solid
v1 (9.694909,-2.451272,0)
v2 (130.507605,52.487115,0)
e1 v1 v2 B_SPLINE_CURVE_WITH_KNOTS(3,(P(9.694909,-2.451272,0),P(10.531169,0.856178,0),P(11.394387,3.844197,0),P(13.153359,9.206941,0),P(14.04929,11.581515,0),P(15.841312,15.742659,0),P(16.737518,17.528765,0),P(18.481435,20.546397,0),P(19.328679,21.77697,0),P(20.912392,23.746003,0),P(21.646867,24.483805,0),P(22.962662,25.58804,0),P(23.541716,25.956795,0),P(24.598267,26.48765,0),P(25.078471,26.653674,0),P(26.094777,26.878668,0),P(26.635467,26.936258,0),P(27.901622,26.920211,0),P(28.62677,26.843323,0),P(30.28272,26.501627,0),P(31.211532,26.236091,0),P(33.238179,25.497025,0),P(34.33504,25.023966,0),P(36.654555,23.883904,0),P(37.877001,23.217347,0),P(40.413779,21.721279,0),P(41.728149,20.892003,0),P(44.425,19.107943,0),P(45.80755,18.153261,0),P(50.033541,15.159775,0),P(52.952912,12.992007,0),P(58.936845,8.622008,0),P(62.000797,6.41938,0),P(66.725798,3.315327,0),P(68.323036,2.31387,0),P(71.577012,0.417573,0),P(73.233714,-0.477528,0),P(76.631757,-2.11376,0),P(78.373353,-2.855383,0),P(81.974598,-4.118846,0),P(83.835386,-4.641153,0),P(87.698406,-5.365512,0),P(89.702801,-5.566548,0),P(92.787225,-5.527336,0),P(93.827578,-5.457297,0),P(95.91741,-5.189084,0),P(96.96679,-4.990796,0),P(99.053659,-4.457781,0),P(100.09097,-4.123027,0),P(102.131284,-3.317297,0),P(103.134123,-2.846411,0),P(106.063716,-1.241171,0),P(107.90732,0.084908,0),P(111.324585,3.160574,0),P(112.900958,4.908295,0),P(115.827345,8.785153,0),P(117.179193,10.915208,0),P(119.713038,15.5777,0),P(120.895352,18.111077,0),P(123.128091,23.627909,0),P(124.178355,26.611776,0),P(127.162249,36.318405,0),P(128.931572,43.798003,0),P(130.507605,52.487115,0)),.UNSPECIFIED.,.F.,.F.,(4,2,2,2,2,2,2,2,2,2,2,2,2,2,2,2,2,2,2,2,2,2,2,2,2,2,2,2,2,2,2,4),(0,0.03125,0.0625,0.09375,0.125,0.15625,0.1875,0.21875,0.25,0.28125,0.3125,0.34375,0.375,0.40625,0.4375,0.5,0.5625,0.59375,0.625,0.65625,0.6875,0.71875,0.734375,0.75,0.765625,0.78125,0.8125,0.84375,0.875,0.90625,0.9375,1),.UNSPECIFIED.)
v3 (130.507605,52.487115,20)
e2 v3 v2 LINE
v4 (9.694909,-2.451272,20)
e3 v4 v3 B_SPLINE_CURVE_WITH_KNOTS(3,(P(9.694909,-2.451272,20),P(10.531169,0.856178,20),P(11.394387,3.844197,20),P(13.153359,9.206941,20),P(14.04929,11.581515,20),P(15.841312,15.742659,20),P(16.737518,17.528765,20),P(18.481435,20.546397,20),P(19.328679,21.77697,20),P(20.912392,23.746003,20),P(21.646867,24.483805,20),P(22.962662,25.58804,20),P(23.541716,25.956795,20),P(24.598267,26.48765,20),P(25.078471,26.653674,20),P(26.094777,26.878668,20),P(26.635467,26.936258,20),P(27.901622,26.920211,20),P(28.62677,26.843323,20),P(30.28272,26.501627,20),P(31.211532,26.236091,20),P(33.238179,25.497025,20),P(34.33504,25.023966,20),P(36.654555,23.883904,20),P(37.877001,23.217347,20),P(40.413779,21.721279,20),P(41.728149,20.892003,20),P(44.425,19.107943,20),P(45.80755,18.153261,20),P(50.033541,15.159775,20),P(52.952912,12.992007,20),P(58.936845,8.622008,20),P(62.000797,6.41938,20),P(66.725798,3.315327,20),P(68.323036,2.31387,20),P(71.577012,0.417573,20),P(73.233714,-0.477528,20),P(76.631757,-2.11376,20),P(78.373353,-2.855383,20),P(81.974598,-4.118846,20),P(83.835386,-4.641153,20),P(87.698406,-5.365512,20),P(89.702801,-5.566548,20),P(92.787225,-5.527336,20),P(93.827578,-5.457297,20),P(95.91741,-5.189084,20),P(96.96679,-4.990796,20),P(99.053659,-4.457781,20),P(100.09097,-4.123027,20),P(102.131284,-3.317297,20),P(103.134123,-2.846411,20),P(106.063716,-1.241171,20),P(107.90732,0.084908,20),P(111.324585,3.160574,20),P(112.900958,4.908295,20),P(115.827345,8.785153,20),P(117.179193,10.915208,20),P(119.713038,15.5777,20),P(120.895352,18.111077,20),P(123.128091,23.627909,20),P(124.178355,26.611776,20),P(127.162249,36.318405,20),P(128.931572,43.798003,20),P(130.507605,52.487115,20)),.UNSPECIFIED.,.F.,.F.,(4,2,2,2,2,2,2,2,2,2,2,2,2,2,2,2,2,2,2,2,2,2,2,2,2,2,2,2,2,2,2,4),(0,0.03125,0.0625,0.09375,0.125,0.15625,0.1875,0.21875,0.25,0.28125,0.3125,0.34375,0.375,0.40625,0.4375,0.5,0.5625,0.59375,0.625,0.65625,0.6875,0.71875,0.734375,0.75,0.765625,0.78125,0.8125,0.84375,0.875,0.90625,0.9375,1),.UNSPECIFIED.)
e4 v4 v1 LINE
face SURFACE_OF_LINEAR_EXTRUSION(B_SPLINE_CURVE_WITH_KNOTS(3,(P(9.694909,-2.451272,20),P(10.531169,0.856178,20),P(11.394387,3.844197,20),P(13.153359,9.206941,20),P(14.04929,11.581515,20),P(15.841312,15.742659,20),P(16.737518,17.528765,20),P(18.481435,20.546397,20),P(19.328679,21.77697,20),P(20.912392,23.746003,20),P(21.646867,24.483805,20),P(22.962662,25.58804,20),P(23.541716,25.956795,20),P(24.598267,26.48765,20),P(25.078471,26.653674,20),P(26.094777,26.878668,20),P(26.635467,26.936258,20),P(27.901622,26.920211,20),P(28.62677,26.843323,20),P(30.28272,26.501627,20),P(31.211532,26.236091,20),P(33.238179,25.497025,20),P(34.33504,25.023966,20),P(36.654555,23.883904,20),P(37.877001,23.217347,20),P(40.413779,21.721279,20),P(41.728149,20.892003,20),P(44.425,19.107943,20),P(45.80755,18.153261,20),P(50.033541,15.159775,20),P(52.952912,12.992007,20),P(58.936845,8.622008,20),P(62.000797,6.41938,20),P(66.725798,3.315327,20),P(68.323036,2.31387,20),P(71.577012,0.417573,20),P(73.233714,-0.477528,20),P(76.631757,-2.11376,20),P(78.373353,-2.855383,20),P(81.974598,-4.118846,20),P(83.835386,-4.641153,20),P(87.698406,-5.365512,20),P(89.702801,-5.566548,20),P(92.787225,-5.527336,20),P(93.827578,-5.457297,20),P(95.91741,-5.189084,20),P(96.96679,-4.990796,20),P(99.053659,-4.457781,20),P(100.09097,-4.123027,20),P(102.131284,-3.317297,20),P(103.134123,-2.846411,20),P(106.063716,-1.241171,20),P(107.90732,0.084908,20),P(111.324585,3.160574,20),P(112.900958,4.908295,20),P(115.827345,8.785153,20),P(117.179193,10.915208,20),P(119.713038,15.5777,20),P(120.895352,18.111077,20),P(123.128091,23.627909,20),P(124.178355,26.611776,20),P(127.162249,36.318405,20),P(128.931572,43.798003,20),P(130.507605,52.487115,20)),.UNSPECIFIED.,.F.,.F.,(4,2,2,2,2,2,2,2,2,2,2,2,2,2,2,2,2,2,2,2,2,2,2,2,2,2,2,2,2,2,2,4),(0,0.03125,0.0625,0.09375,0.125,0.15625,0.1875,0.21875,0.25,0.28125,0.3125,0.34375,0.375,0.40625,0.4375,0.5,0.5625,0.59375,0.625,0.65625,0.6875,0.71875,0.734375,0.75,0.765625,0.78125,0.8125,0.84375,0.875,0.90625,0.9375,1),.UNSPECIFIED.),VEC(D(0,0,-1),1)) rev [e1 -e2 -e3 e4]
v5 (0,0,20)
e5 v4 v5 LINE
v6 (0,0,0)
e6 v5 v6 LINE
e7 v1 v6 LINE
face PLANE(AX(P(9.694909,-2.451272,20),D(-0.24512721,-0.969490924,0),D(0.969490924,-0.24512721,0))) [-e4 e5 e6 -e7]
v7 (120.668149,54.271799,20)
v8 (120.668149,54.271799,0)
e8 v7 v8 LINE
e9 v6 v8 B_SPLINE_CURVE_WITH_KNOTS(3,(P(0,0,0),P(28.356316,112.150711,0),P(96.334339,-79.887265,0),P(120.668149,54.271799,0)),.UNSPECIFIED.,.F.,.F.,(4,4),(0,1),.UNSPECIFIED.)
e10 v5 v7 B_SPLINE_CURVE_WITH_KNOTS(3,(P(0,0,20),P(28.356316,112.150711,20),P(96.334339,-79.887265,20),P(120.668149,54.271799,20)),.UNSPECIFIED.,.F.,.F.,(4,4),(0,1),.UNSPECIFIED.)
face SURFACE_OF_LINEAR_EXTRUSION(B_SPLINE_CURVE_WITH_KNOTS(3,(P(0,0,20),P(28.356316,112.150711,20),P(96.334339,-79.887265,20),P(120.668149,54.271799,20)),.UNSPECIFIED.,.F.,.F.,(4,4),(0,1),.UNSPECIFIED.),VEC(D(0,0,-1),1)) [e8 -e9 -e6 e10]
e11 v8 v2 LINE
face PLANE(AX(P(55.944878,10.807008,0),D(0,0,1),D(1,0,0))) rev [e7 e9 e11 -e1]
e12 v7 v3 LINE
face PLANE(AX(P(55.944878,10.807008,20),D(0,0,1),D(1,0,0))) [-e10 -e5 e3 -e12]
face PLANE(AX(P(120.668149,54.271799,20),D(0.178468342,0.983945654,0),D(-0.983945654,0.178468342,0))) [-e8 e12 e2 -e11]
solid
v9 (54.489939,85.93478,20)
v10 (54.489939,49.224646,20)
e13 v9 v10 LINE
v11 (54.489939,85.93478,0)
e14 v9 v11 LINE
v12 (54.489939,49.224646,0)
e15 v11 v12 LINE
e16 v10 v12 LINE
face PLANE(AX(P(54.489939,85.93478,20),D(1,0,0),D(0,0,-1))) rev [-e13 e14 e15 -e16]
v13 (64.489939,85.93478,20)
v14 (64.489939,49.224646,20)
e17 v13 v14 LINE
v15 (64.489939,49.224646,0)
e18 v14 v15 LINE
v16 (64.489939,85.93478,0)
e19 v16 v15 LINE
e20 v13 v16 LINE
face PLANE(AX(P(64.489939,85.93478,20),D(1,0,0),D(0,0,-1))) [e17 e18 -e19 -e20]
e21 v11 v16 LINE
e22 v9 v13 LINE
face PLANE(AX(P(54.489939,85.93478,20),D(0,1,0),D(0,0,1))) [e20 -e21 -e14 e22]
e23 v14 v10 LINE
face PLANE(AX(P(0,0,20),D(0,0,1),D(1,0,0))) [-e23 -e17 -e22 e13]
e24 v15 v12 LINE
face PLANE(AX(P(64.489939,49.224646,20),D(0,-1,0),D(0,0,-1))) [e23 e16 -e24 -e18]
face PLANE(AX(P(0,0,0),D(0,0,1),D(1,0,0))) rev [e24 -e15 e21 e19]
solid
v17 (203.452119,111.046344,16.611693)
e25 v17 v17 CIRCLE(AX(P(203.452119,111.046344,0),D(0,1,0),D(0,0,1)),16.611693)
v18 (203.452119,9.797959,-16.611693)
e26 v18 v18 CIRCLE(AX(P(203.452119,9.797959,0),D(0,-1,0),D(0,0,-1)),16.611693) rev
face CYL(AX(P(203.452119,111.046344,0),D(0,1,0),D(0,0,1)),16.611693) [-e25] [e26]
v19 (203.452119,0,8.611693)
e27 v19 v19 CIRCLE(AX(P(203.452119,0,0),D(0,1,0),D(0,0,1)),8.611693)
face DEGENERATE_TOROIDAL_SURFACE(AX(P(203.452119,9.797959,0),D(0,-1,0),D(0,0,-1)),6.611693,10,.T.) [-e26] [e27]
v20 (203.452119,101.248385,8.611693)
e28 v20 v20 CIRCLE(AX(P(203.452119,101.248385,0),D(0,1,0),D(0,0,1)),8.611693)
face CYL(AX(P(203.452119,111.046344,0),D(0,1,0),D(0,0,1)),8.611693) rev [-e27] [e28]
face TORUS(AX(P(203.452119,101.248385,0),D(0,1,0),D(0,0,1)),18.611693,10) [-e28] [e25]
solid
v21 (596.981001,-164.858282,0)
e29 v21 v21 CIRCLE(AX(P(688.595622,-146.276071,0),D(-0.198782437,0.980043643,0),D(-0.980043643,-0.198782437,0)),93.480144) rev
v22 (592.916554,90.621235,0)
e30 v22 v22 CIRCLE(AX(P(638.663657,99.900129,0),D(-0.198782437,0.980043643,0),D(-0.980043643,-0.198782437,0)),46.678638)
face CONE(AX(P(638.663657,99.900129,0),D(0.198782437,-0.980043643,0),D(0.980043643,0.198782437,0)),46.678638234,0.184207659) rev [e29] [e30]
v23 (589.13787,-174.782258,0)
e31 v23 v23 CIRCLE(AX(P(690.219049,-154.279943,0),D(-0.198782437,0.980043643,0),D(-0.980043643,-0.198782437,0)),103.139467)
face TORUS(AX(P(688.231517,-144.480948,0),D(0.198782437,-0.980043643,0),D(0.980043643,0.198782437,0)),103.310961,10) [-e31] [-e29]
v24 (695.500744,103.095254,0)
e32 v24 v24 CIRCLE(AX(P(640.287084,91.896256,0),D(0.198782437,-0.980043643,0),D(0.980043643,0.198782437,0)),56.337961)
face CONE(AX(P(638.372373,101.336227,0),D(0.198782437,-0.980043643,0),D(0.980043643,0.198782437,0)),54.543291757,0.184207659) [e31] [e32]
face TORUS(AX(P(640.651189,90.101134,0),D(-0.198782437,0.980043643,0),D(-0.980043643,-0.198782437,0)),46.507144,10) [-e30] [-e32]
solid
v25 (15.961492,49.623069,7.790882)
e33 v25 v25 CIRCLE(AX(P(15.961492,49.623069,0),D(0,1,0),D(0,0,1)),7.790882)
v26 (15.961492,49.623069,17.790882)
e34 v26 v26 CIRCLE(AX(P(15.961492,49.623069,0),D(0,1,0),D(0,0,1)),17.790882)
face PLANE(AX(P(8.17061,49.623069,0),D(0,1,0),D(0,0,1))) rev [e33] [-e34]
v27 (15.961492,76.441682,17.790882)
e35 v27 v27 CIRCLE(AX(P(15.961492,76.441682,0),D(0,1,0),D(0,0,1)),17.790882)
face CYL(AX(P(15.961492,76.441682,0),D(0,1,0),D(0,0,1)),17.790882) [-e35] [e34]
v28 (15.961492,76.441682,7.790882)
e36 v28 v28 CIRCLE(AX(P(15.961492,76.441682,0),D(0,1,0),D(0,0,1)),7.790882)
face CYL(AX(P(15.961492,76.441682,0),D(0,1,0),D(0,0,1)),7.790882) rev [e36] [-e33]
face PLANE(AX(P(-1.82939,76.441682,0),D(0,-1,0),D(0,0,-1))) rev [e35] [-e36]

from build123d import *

# Parameters (mm, degrees)
EXTRUDE_THIN1_OUTLINE_W = 9.999999999999993
EXTRUDE_THIN1_OUTLINE_H = 36.710134862
EXTRUDE_THIN1_DEPTH     = 20
SKETCH3_W               = 10
SKETCH3_H               = 26.81861266200005
SKETCH4_W               = 8
SKETCH4_H               = 111.0463440008494
FILLET1_R               = 10
FILLET2_R               = 10
FILLET6_R               = 10
FILLET7_R               = 10


# Read off the part's stored shape, not the designer's step: Extrude-Thin1
with BuildPart() as part:
    # Extrude-Thin1 outline → Extrude-Thin1 (new body)
    with BuildSketch(Plane.XY):
        with Locations((59.489938632999994, 67.579713016)):
            Rectangle(EXTRUDE_THIN1_OUTLINE_W, EXTRUDE_THIN1_OUTLINE_H)
        with BuildLine():
            Line((0, 0), (9.694909236, -2.4512721))
            add(Edge.make_bspline(
                [(9.694909236, -2.4512721), (10.5311688474778, 0.856178359172851), (11.394386774256, 3.84419741254524), (13.1533592305206, 9.20694051284605), (14.0492896362296, 11.5815145840632), (15.8413121087331, 15.742658734528), (16.737517517862, 17.5287647227855), (18.4814345025707, 20.5463967391919), (19.3286793802721, 21.7769702062188), (20.9123918030556, 23.7460025130972), (21.6468668792936, 24.4838050755776), (22.9626621572418, 25.5880403665081), (23.5417164826069, 25.9567946857274), (24.5982667995349, 26.4876499635343), (25.0784708138462, 26.6536744426382), (26.0947773614352, 26.8786677388824), (26.6354672734258, 26.9362581428574), (27.9016220528546, 26.9202105728274), (28.6267698076733, 26.8433228296364), (30.2827198681421, 26.501626749094), (31.2115323200941, 26.2360905599305), (33.2381790124912, 25.4970253861064), (34.3350401710325, 25.0239655597566), (36.6545545212303, 23.8839035231942), (37.8770010886368, 23.2173466425486), (40.413779447504, 21.7212794308362), (41.7281493534382, 20.8920027901708), (44.4249998964398, 19.1079431631433), (45.8075500630837, 18.1532614063299), (50.0335414120897, 15.1597754687626), (52.9529117796699, 12.9920070265115), (58.9368445543254, 8.62200824840444), (62.0007966750851, 6.41938014676282), (66.7257978693274, 3.31532694879324), (68.3230359680193, 2.313869999449), (71.5770117142215, 0.417572758509964), (73.2337136485033, -0.477527792876216), (76.6317569670157, -2.11375987107278), (78.3733528188264, -2.85538269335876), (81.9745983323873, -4.11884560626711), (83.8353857946341, -4.64115314789327), (87.6984061214208, -5.36551199552065), (89.7028005800273, -5.56654784071354), (92.7872249227571, -5.52733551388739), (93.8275778829024, -5.45729724278707), (95.9174101948477, -5.18908376162479), (96.9667901072056, -4.99079603224231), (99.0536589714669, -4.45778102161726), (100.0909704087, -4.12302677221439), (102.131284140322, -3.3172969507252), (103.13412254263, -2.84641134529941), (106.063715631323, -1.24117058796995), (107.907320493612, 0.0849084234402593), (111.324584701444, 3.16057354469398), (112.900958390548, 4.90829500464283), (115.827345406093, 8.7851531963294), (117.179193265889, 10.9152075498616), (119.713037579898, 15.5776997205682), (120.895351993834, 18.1110774147558), (123.128090663281, 23.6279089006282), (124.178355260339, 26.6117757902841), (127.162248988825, 36.3184054964138), (128.931571554216, 43.7980034470408), (130.507605163, 52.487115477)],
                knots=[0, 0, 0, 0, 0.03125, 0.03125, 0.0624999999999999, 0.0624999999999999, 0.0937499999999999, 0.0937499999999999, 0.125, 0.125, 0.15625, 0.15625, 0.1875, 0.1875, 0.21875, 0.21875, 0.25, 0.25, 0.28125, 0.28125, 0.3125, 0.3125, 0.34375, 0.34375, 0.375, 0.375, 0.40625, 0.40625, 0.4375, 0.4375, 0.5, 0.5, 0.5625, 0.5625, 0.59375, 0.59375, 0.625, 0.625, 0.65625, 0.65625, 0.6875, 0.6875, 0.71875, 0.71875, 0.734375, 0.734375, 0.75, 0.75, 0.765625, 0.765625, 0.78125, 0.78125, 0.8125, 0.8125, 0.84375, 0.84375, 0.875, 0.875, 0.90625, 0.90625, 0.9375, 0.9375, 1, 1, 1, 1], degree=3))
            Line((130.507605163, 52.487115477), (120.668148619, 54.2717989))
            add(Edge.make_bspline(
                [(0, 0), (28.3563158244911, 112.15071072711), (96.3343394540236, -79.8872652449302), (120.668148619, 54.2717989)],
                knots=[0, 0, 0, 0, 1, 1, 1, 1], degree=3))
        make_face()
    extrude(amount=EXTRUDE_THIN1_DEPTH)


with BuildPart() as body_2:
    # Sketch3 → Revolve-Thin1 (revolve)
    with BuildSketch(Plane.XY, mode=Mode.PRIVATE) as revolve_thin1_sk:
        with Locations((3.1706102671758742, 63.03237569384922)):
            Rectangle(SKETCH3_W, SKETCH3_H)
    revolve(revolve_thin1_sk.sketch.rotate(Axis((15.961492157812756, 76.44168202484924, 0), (0, -1, 0)), 270), axis=Axis((15.961492157812756, 76.44168202484924, 0), (0, -1, 0)))


with BuildPart() as body_3:
    # Sketch4 → Revolve-Thin2 (revolve)
    with BuildSketch(Plane.XY, mode=Mode.PRIVATE) as revolve_thin2_sk:
        with Locations((190.84042517006557, 55.5231720004247)):
            Rectangle(SKETCH4_W, SKETCH4_H)
    revolve(revolve_thin2_sk.sketch.rotate(Axis((203.4521186248573, 111.04634400084939, 0), (0, -1, 0)), 270), axis=Axis((203.4521186248573, 111.04634400084939, 0), (0, -1, 0)))

    # Fillet1
    # the kernel refuses this fillet: 10 mm, written as the material it takes off along each edge
    with BuildSketch(Plane(origin=(203.4521186248573, 111.04634400084939, 0), x_dir=(0, 0, 1), z_dir=(1, 0, 0))) as fillet1_piece_1:
        with BuildLine():
            CenterArc((18.61169345479169, 9.797958971132715), FILLET1_R, 180, 78.4630409671845)
            Line((16.61169345479169, 0), (16.571693454791692, -0.19595917942265828))
            ThreePointArc((16.571693454791692, -0.19595917942265828), (12.611693454791691, -0.20000000000000284), (8.611693454791691, -0.20000000000000284))
            Line((8.611693454791691, -0.20000000000000284), (8.411693454791692, 0))
            Line((8.411693454791692, 0), (8.411693454791692, 9.797958971132715))
            Line((8.411693454791692, 9.797958971132715), (8.611693454791691, 9.797958971132715))
        make_face()
    revolve(axis=Axis((203.4521186248573, 111.04634400084939, 0), (0, -1, 0)), mode=Mode.SUBTRACT)

    # Fillet2
    # the kernel refuses this fillet: 10 mm, written as the material it takes off along each edge
    with BuildSketch(Plane(origin=(203.4521186248573, 0, 0), x_dir=(1.71e-15, 0, 1), z_dir=(1, 0, -1.71e-15))) as fillet2_piece_1:
        with BuildLine():
            CenterArc((6.611693454791691, -9.797958971132712), FILLET2_R, 0, 78.4630409671845)
            Line((16.61169345479169, -9.797958971132712), (16.81169345479169, -9.797958971132712))
            Line((16.81169345479169, -9.797958971132712), (16.81169345479169, 0))
            Line((16.81169345479169, 0), (16.61169345479169, 0.2))
            ThreePointArc((16.61169345479169, 0.2), (12.611693454791691, 0.2), (8.65169345479169, 0.19595917942265426))
            Line((8.65169345479169, 0.19595917942265426), (8.611693454791691, 0))
        make_face()
    revolve(axis=Axis((203.4521186248573, 0, 0), (0, -1, 0)), mode=Mode.SUBTRACT)


with BuildPart() as body_4:
    # Sketch8 → Revolve-Thin3 (revolve)
    with BuildSketch(Plane.XY):
        Polygon((592.9165543990568, 90.62123521338879), (597.1368581551377, -174.65500088312245), (589.1378703596948, -174.78225750714086), (584.917566603614, 90.49397858937037), align=None)
    revolve(axis=Axis((640.5456967891123, 90.62123521338879, 0), (0.19878243707787766, -0.9800436432676759, 0)))

    # Fillet6
    # the kernel refuses this fillet: 10 mm, written as the material it takes off along each edge
    with BuildSketch(Plane(origin=(638.3723729729767, 101.33622705108073, 0), x_dir=(-0.9800436432676759, -0.19878243707787757, 0), z_dir=(0, 0, 1))) as fillet6_piece_1:
        with BuildLine():
            CenterArc((46.507144024662985, 11.463870621378966), FILLET6_R, 270.9826376087404, 78.46304096718501)
            Line((46.67863823366485, 1.465341242701382), (46.68206811784489, 1.2653706551278228))
            ThreePointArc((46.68206811784489, 1.2653706551278228), (50.57433146427542, 0.5360542832667986), (54.50665822595351, -0.19661633808389894))
            Line((54.50665822595351, -0.19661633808389894), (54.739908095105, -0.03663353106753944))
            Line((54.739908095105, -0.03663353106753944), (56.534577266942115, 9.595560536934707))
            Line((56.534577266942115, 9.595560536934707), (56.33796092885816, 9.632194068002248))
        make_face()
    revolve(axis=Axis((638.3723729729767, 101.33622705108073, 0), (0.19878243707787766, -0.9800436432676759, 0)), mode=Mode.SUBTRACT)

    # Fillet7
    # the kernel refuses this fillet: 10 mm, written as the material it takes off along each edge
    with BuildSketch(Plane(origin=(690.5103330727782, -155.71604134794063, 0), x_dir=(-0.9800436432676758, -0.19878243707787768, 0), z_dir=(0, 0, 0.9999999999999999))) as fillet7_piece_1:
        with BuildLine():
            CenterArc((103.31096080732812, -11.463870621378936), FILLET7_R, 90.98263760874039, 78.46304096718495)
            Line((103.13946659832625, -1.4653412427013406), (103.1360367141462, -1.265370655127797))
            ThreePointArc((103.1360367141462, -1.265370655127797), (99.24377336771579, -0.5360542832668204), (95.31144660603758, 0.19661633808389678))
            Line((95.31144660603758, 0.19661633808389678), (95.07819673688608, 0.03663353106753908))
            Line((95.07819673688608, 0.03663353106753908), (93.28352756504898, -9.595560536934663))
            Line((93.28352756504898, -9.595560536934663), (93.48014390313294, -9.632194068002203))
        make_face()
    revolve(axis=Axis((690.5103330727782, -155.71604134794063, 0), (0.19878243707787766, -0.9800436432676759, 0)), mode=Mode.SUBTRACT)


solid = Compound([part.part, body_2.part, body_3.part, body_4.part])
